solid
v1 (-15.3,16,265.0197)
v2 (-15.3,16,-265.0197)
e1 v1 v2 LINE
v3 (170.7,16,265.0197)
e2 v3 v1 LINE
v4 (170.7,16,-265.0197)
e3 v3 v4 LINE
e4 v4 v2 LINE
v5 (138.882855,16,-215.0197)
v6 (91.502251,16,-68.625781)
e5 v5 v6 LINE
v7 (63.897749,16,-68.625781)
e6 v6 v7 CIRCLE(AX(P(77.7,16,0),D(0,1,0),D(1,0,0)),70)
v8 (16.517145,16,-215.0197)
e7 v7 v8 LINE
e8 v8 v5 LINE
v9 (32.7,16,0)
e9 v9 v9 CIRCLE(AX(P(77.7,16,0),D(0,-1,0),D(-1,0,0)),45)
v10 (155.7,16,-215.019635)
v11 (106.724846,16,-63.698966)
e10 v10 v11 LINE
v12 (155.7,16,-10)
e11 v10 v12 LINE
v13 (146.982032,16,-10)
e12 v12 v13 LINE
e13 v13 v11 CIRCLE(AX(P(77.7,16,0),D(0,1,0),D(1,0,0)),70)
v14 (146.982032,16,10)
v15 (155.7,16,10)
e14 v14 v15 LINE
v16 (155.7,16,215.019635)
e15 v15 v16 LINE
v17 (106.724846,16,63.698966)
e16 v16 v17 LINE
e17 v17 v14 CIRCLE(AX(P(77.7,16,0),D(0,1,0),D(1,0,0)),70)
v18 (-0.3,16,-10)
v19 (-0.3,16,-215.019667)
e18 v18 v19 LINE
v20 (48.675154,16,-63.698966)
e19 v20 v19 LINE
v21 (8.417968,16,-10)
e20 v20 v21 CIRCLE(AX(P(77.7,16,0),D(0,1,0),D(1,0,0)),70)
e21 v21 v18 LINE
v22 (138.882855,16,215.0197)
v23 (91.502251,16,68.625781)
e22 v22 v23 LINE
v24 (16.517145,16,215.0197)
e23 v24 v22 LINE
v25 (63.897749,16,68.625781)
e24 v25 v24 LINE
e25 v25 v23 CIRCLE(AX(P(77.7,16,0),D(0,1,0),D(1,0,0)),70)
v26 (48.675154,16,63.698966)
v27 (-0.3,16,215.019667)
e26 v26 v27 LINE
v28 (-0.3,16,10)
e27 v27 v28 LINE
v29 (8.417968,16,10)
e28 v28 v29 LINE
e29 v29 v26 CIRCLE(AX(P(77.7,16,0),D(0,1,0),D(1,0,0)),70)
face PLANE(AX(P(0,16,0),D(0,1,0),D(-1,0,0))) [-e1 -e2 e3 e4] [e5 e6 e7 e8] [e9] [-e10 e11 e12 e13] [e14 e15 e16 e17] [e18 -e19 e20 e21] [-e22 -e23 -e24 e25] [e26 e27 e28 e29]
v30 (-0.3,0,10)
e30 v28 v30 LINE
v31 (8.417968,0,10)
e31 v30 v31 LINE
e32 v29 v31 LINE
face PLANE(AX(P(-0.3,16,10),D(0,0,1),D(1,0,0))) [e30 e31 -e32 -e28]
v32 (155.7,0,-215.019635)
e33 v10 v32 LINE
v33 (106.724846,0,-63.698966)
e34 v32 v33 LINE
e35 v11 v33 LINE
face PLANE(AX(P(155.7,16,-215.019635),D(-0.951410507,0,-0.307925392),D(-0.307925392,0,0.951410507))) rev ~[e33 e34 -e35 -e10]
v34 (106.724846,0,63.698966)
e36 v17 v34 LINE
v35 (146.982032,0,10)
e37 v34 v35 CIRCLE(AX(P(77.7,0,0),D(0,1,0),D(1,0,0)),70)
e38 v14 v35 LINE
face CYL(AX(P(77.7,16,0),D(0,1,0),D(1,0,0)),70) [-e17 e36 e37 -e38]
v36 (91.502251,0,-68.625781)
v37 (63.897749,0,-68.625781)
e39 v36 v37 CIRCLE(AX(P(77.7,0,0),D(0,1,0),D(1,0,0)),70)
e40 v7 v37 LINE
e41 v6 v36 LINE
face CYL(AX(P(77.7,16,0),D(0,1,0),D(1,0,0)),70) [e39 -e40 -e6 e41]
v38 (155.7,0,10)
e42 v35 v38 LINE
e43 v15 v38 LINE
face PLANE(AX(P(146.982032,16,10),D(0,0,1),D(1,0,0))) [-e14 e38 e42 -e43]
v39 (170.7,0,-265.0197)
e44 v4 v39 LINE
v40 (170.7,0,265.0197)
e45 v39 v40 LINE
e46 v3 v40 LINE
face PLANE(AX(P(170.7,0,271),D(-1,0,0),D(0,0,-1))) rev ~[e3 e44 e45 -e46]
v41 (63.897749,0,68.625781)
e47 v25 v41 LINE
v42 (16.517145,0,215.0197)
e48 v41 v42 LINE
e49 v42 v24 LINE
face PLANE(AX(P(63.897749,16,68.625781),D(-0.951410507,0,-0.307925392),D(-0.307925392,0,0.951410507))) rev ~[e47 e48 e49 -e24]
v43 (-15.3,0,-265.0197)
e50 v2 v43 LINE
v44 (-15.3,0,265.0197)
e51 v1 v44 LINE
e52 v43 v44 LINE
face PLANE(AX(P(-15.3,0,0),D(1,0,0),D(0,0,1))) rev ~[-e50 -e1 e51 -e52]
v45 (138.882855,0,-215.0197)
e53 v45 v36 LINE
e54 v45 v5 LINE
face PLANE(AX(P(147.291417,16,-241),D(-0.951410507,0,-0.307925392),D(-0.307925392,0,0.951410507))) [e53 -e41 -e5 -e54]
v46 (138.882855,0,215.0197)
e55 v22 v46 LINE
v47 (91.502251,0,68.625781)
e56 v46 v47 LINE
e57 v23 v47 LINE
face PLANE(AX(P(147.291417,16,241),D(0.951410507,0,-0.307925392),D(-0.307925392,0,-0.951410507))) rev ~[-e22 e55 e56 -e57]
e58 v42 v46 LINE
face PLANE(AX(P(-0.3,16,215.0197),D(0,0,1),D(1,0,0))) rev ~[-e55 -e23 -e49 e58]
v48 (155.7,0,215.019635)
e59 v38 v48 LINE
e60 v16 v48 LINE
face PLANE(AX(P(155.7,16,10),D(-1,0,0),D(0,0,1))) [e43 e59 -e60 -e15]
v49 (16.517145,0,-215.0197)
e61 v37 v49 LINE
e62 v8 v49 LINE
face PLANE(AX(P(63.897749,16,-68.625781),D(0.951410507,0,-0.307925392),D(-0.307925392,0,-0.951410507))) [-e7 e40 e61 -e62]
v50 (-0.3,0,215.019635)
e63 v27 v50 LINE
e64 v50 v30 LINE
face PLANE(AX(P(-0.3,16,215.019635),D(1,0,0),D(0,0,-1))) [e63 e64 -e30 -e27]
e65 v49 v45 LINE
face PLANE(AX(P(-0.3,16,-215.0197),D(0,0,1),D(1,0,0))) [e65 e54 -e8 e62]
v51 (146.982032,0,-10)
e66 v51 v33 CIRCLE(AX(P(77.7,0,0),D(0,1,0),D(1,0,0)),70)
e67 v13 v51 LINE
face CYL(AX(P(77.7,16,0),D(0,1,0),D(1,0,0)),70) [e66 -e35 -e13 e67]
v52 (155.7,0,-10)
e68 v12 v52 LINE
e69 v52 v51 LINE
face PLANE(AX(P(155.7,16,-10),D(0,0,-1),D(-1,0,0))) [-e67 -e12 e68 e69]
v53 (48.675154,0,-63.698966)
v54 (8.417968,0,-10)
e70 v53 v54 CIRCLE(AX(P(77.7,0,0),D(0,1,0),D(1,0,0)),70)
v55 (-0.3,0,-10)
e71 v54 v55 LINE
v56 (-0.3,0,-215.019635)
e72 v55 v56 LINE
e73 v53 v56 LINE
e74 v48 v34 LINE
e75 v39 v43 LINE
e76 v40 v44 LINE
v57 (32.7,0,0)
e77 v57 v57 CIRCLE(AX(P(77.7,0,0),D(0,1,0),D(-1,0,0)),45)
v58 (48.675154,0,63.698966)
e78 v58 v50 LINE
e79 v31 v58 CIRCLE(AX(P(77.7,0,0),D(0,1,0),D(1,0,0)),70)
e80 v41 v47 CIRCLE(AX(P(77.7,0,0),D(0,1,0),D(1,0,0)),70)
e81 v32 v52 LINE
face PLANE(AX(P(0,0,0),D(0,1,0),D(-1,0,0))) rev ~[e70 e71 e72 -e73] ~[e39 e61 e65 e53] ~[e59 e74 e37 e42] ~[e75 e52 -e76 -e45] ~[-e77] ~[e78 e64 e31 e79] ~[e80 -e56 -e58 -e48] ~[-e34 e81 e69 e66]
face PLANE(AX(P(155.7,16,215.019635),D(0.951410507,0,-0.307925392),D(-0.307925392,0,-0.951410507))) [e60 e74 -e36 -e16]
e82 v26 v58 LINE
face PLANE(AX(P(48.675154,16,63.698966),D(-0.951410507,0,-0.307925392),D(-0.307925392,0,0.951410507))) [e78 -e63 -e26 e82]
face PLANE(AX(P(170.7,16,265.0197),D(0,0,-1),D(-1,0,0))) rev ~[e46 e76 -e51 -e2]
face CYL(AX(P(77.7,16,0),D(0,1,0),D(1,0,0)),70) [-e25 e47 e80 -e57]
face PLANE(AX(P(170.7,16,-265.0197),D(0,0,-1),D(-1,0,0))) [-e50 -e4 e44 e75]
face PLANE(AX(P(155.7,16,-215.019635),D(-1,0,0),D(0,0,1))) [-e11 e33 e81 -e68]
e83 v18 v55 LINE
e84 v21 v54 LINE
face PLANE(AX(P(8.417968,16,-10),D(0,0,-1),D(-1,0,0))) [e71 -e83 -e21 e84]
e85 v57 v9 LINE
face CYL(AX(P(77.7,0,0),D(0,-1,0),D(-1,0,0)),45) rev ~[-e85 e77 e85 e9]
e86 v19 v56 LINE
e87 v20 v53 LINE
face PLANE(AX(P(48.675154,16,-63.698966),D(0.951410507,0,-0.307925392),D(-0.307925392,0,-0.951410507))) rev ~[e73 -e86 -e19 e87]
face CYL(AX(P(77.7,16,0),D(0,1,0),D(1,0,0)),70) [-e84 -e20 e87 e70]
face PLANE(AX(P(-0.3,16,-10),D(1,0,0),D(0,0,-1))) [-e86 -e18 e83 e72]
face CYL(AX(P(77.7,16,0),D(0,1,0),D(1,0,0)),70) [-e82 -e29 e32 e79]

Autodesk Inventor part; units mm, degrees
ref_plane "YZ Plane" through (0, 0, 0) normal (1, 0, 0) x (0, 1, 0)
ref_plane "XZ Plane" through (0, 0, 0) normal (0, 1, 0) x (-1, 0, 0)
ref_plane "XY Plane" through (0, 0, 0) normal (0, 0, 1) x (1, 0, 0)
sketch "Sketch1" plane through (0, 0, 0) normal (0, 1, 0) x (-1, 0, 0)
  line L0 (15.3, 271) -> (-170.7, 271)
  line L1 (-170.7, 271) -> (-170.7, -271)
  line L2 (-170.7, -271) -> (15.3, -271)
  line L3 (15.3, -271) -> (15.3, 271)
  line L4 (-77.7, 271) -> (-77.7, -271)
  line L5 (-170.7, 0) -> (15.3, 0)
  circle A0 centre (-77.7, 0) radius 45
  point P0 (0, 0)
  dimension "d0" = 542
  dimension "d1" = 186
  dimension "d2" = 90
extrude "Extrusion1" add sketch "Sketch1" along normal blind 16 contours L3 L5 A0 L4 L0 | L4 A0 L5 L1 L0 | L3 L2 L4 A0 L5 | L5 A0 L4 L2 L1
sketch "Sketch2" plane through (170.7, 0, 271) normal (1, 0, 0) x (0, 0, -1)
  line L0 (0, 0) -> (0, 16) projected
  line L1 (0, 6) -> (-25, 6)
  line L2 (-25, 6) -> (-25, 0)
  line L3 (-25, 0) -> (0, 0)
  line L4 (0, 0) -> (0, 6)
  line L5 (542, 0) -> (542, 16) projected
  line L6 (542, 6) -> (567, 6)
  line L7 (567, 6) -> (567, 0)
  line L8 (567, 0) -> (542, 0)
  line L9 (542, 0) -> (542, 6)
  line L10 (542, 16) -> (527, 16)
  line L11 (527, 16) -> (527, 66)
  line L12 (527, 66) -> (542, 66)
  line L13 (542, 66) -> (542, 16)
  line L14 (0, 16) -> (15, 16)
  line L15 (15, 16) -> (15, 66)
  line L16 (15, 66) -> (0, 66)
  line L17 (0, 66) -> (0, 16)
  point P0 (271, 0)
  dimension "d5" = 6
  dimension "d6" = 25
  dimension "d7" = 25
  dimension "d8" = 50
  dimension "d9" = 15
  dimension "d10" = 15
  dimension "d11" = 50
extrude "Extrusion2" add sketch "Sketch2" against normal up to surface (186 mm away)
sketch "Sketch3" plane through (0, 16, 0) normal (0, 1, 0) x (1, 0, 0)
  line L0 (170.7, 256) -> (-15.3, 256) projected
  line L1 (-15.3, 256) -> (-15.3, -256) projected
  line L2 (-15.3, -256) -> (170.7, -256) projected
  line L3 (170.7, -256) -> (170.7, 256) projected
  circle A0 centre (77.7, 0) radius 45 projected
  line L4 (-0.3, -241) -> (-0.3, 241)
  line L5 (-0.3, 241) -> (155.7, 241)
  line L6 (155.7, 241) -> (155.7, -241)
  line L7 (155.7, -241) -> (-0.3, -241)
  circle A1 centre (77.7, 0) radius 70
  line L8 (155.7, -241) -> (-0.3, 241)
  line L9 (155.7, 241) -> (-0.3, -241)
  line L10 (148.0887, 243.4634) -> (-7.9113, -238.5366)
  line L11 (163.3113, 238.5366) -> (7.3113, -243.4634)
  line L12 (148.0887, -243.4634) -> (-7.9113, 238.5366)
  line L13 (163.3113, -238.5366) -> (7.3113, 243.4634)
  line L14 (-0.3, -10) -> (155.7, -10)
  line L15 (155.7, -10) -> (155.7, 10)
  line L16 (155.7, 10) -> (-0.3, 10)
  line L17 (-0.3, 10) -> (-0.3, -10)
  point P0 (0, 0)
  point P1 (77.7, 0)
  point P2 (77.7, 0)
  point P3 (146.982, 10)
  point P4 (155.7, 215.0197)
  point P5 (106.7248, 63.699)
  point P6 (146.982, -10)
  point P7 (106.7248, -63.699)
  point P8 (155.7, -215.0197)
  point P9 (8.1086, 241)
  point P10 (63.8977, 68.6258)
  point P11 (91.5023, 68.6258)
  point P12 (147.2914, 241)
  point P13 (-0.3, 10)
  point P14 (8.418, 10)
  point P15 (48.6752, 63.699)
  point P16 (-0.3, 215.0197)
  point P17 (8.418, -10)
  point P18 (-0.3, -215.0197)
  point P19 (48.6752, -63.699)
  point P20 (147.2914, -241)
  point P21 (91.5023, -68.6258)
  point P22 (63.8977, -68.6258)
  point P23 (8.1086, -241)
  dimension "d14" = 25
  dimension "d15" = 15
  dimension "d16" = 10
  dimension "d17" = 10
  dimension "d18" = 8
  dimension "d19" = 8
  dimension "d20" = 8
  dimension "d21" = 8
extrude "Extrusion3" cut sketch "Sketch3" against normal blind 20 contours A1 L11 L6 L16 | L14 L6 L13 A1 | A1 L13 L5 L10 | L12 L7 L11 A1 | A1 L16 L4 L12 | L10 L4 L14 A1
sketch "Sketch4" plane through (0, 16, 0) normal (0, 1, 0) x (1, 0, 0)
  line L0 (-0.3, 10) -> (-0.3, 215.0197) projected
  line L1 (-0.3, 215.0197) -> (156, 215.0197)
  line L2 (156, 215.0197) -> (156, 245)
  line L3 (156, 245) -> (-0.3, 245)
  line L4 (-0.3, 245) -> (-0.3, 215.0197)
  line L5 (-0.3, -215.0197) -> (48.6752, -63.699) projected
  line L6 (-0.3, -215.0197) -> (158, -215.0197)
  line L7 (158, -215.0197) -> (158, -245)
  line L8 (158, -245) -> (-0.3, -245)
  line L9 (-0.3, -245) -> (-0.3, -215.0197)
  point P0 (0, 0)
extrude "Extrusion4" add sketch "Sketch4" against normal up to surface (16 mm away)
sketch "Sketch5" plane through (0, 16, 0) normal (0, 1, 0) x (1, 0, 0)
  line L0 (-72, -376) -> (216, -376)
  line L1 (216, -376) -> (216, -255.0197)
  line L2 (216, -255.0197) -> (-72, -255.0197)
  line L3 (-72, -255.0197) -> (-72, -376)
  line L4 (-67, 399) -> (218, 399)
  line L5 (218, 399) -> (218, 255.0197)
  line L6 (218, 255.0197) -> (-67, 255.0197)
  line L7 (-67, 255.0197) -> (-67, 399)
  line L8 (16.5171, 215.0197) -> (138.8829, 215.0197) projected
  line L9 (138.8829, -215.0197) -> (16.5171, -215.0197) projected
  point P0 (0, 0)
  dimension "d26" = 40
  dimension "d27" = 40
extrude "Extrusion5" cut sketch "Sketch5" along normal mid plane 100
sketch "Sketch6" plane through (0, 16, 0) normal (0, 1, 0) x (1, 0, 0)
  line L0 (-15.3, 255.0197) -> (-15.3, -255.0197) projected
  line L1 (-15.3, 255.0197) -> (170.7, 255.0197)
  line L2 (170.7, 255.0197) -> (170.7, 265.0197)
  line L3 (170.7, 265.0197) -> (-15.3, 265.0197)
  line L4 (-15.3, 265.0197) -> (-15.3, 255.0197)
  line L5 (-15.3, -255.0197) -> (170.7, -255.0197)
  line L6 (170.7, -255.0197) -> (170.7, -265.0197)
  line L7 (170.7, -265.0197) -> (-15.3, -265.0197)
  line L8 (-15.3, -265.0197) -> (-15.3, -255.0197)
  line L9 (-15.3, -255.0197) -> (170.7, -255.0197) projected
  point P0 (0, 0)
  dimension "d30" = 10
  dimension "d31" = 0
  dimension "d32" = 10
extrude "Extrusion6" add sketch "Sketch6" against normal up to surface (16 mm away)
properties part number "A_AxisKrovatka" material "Aluminum 6061"
